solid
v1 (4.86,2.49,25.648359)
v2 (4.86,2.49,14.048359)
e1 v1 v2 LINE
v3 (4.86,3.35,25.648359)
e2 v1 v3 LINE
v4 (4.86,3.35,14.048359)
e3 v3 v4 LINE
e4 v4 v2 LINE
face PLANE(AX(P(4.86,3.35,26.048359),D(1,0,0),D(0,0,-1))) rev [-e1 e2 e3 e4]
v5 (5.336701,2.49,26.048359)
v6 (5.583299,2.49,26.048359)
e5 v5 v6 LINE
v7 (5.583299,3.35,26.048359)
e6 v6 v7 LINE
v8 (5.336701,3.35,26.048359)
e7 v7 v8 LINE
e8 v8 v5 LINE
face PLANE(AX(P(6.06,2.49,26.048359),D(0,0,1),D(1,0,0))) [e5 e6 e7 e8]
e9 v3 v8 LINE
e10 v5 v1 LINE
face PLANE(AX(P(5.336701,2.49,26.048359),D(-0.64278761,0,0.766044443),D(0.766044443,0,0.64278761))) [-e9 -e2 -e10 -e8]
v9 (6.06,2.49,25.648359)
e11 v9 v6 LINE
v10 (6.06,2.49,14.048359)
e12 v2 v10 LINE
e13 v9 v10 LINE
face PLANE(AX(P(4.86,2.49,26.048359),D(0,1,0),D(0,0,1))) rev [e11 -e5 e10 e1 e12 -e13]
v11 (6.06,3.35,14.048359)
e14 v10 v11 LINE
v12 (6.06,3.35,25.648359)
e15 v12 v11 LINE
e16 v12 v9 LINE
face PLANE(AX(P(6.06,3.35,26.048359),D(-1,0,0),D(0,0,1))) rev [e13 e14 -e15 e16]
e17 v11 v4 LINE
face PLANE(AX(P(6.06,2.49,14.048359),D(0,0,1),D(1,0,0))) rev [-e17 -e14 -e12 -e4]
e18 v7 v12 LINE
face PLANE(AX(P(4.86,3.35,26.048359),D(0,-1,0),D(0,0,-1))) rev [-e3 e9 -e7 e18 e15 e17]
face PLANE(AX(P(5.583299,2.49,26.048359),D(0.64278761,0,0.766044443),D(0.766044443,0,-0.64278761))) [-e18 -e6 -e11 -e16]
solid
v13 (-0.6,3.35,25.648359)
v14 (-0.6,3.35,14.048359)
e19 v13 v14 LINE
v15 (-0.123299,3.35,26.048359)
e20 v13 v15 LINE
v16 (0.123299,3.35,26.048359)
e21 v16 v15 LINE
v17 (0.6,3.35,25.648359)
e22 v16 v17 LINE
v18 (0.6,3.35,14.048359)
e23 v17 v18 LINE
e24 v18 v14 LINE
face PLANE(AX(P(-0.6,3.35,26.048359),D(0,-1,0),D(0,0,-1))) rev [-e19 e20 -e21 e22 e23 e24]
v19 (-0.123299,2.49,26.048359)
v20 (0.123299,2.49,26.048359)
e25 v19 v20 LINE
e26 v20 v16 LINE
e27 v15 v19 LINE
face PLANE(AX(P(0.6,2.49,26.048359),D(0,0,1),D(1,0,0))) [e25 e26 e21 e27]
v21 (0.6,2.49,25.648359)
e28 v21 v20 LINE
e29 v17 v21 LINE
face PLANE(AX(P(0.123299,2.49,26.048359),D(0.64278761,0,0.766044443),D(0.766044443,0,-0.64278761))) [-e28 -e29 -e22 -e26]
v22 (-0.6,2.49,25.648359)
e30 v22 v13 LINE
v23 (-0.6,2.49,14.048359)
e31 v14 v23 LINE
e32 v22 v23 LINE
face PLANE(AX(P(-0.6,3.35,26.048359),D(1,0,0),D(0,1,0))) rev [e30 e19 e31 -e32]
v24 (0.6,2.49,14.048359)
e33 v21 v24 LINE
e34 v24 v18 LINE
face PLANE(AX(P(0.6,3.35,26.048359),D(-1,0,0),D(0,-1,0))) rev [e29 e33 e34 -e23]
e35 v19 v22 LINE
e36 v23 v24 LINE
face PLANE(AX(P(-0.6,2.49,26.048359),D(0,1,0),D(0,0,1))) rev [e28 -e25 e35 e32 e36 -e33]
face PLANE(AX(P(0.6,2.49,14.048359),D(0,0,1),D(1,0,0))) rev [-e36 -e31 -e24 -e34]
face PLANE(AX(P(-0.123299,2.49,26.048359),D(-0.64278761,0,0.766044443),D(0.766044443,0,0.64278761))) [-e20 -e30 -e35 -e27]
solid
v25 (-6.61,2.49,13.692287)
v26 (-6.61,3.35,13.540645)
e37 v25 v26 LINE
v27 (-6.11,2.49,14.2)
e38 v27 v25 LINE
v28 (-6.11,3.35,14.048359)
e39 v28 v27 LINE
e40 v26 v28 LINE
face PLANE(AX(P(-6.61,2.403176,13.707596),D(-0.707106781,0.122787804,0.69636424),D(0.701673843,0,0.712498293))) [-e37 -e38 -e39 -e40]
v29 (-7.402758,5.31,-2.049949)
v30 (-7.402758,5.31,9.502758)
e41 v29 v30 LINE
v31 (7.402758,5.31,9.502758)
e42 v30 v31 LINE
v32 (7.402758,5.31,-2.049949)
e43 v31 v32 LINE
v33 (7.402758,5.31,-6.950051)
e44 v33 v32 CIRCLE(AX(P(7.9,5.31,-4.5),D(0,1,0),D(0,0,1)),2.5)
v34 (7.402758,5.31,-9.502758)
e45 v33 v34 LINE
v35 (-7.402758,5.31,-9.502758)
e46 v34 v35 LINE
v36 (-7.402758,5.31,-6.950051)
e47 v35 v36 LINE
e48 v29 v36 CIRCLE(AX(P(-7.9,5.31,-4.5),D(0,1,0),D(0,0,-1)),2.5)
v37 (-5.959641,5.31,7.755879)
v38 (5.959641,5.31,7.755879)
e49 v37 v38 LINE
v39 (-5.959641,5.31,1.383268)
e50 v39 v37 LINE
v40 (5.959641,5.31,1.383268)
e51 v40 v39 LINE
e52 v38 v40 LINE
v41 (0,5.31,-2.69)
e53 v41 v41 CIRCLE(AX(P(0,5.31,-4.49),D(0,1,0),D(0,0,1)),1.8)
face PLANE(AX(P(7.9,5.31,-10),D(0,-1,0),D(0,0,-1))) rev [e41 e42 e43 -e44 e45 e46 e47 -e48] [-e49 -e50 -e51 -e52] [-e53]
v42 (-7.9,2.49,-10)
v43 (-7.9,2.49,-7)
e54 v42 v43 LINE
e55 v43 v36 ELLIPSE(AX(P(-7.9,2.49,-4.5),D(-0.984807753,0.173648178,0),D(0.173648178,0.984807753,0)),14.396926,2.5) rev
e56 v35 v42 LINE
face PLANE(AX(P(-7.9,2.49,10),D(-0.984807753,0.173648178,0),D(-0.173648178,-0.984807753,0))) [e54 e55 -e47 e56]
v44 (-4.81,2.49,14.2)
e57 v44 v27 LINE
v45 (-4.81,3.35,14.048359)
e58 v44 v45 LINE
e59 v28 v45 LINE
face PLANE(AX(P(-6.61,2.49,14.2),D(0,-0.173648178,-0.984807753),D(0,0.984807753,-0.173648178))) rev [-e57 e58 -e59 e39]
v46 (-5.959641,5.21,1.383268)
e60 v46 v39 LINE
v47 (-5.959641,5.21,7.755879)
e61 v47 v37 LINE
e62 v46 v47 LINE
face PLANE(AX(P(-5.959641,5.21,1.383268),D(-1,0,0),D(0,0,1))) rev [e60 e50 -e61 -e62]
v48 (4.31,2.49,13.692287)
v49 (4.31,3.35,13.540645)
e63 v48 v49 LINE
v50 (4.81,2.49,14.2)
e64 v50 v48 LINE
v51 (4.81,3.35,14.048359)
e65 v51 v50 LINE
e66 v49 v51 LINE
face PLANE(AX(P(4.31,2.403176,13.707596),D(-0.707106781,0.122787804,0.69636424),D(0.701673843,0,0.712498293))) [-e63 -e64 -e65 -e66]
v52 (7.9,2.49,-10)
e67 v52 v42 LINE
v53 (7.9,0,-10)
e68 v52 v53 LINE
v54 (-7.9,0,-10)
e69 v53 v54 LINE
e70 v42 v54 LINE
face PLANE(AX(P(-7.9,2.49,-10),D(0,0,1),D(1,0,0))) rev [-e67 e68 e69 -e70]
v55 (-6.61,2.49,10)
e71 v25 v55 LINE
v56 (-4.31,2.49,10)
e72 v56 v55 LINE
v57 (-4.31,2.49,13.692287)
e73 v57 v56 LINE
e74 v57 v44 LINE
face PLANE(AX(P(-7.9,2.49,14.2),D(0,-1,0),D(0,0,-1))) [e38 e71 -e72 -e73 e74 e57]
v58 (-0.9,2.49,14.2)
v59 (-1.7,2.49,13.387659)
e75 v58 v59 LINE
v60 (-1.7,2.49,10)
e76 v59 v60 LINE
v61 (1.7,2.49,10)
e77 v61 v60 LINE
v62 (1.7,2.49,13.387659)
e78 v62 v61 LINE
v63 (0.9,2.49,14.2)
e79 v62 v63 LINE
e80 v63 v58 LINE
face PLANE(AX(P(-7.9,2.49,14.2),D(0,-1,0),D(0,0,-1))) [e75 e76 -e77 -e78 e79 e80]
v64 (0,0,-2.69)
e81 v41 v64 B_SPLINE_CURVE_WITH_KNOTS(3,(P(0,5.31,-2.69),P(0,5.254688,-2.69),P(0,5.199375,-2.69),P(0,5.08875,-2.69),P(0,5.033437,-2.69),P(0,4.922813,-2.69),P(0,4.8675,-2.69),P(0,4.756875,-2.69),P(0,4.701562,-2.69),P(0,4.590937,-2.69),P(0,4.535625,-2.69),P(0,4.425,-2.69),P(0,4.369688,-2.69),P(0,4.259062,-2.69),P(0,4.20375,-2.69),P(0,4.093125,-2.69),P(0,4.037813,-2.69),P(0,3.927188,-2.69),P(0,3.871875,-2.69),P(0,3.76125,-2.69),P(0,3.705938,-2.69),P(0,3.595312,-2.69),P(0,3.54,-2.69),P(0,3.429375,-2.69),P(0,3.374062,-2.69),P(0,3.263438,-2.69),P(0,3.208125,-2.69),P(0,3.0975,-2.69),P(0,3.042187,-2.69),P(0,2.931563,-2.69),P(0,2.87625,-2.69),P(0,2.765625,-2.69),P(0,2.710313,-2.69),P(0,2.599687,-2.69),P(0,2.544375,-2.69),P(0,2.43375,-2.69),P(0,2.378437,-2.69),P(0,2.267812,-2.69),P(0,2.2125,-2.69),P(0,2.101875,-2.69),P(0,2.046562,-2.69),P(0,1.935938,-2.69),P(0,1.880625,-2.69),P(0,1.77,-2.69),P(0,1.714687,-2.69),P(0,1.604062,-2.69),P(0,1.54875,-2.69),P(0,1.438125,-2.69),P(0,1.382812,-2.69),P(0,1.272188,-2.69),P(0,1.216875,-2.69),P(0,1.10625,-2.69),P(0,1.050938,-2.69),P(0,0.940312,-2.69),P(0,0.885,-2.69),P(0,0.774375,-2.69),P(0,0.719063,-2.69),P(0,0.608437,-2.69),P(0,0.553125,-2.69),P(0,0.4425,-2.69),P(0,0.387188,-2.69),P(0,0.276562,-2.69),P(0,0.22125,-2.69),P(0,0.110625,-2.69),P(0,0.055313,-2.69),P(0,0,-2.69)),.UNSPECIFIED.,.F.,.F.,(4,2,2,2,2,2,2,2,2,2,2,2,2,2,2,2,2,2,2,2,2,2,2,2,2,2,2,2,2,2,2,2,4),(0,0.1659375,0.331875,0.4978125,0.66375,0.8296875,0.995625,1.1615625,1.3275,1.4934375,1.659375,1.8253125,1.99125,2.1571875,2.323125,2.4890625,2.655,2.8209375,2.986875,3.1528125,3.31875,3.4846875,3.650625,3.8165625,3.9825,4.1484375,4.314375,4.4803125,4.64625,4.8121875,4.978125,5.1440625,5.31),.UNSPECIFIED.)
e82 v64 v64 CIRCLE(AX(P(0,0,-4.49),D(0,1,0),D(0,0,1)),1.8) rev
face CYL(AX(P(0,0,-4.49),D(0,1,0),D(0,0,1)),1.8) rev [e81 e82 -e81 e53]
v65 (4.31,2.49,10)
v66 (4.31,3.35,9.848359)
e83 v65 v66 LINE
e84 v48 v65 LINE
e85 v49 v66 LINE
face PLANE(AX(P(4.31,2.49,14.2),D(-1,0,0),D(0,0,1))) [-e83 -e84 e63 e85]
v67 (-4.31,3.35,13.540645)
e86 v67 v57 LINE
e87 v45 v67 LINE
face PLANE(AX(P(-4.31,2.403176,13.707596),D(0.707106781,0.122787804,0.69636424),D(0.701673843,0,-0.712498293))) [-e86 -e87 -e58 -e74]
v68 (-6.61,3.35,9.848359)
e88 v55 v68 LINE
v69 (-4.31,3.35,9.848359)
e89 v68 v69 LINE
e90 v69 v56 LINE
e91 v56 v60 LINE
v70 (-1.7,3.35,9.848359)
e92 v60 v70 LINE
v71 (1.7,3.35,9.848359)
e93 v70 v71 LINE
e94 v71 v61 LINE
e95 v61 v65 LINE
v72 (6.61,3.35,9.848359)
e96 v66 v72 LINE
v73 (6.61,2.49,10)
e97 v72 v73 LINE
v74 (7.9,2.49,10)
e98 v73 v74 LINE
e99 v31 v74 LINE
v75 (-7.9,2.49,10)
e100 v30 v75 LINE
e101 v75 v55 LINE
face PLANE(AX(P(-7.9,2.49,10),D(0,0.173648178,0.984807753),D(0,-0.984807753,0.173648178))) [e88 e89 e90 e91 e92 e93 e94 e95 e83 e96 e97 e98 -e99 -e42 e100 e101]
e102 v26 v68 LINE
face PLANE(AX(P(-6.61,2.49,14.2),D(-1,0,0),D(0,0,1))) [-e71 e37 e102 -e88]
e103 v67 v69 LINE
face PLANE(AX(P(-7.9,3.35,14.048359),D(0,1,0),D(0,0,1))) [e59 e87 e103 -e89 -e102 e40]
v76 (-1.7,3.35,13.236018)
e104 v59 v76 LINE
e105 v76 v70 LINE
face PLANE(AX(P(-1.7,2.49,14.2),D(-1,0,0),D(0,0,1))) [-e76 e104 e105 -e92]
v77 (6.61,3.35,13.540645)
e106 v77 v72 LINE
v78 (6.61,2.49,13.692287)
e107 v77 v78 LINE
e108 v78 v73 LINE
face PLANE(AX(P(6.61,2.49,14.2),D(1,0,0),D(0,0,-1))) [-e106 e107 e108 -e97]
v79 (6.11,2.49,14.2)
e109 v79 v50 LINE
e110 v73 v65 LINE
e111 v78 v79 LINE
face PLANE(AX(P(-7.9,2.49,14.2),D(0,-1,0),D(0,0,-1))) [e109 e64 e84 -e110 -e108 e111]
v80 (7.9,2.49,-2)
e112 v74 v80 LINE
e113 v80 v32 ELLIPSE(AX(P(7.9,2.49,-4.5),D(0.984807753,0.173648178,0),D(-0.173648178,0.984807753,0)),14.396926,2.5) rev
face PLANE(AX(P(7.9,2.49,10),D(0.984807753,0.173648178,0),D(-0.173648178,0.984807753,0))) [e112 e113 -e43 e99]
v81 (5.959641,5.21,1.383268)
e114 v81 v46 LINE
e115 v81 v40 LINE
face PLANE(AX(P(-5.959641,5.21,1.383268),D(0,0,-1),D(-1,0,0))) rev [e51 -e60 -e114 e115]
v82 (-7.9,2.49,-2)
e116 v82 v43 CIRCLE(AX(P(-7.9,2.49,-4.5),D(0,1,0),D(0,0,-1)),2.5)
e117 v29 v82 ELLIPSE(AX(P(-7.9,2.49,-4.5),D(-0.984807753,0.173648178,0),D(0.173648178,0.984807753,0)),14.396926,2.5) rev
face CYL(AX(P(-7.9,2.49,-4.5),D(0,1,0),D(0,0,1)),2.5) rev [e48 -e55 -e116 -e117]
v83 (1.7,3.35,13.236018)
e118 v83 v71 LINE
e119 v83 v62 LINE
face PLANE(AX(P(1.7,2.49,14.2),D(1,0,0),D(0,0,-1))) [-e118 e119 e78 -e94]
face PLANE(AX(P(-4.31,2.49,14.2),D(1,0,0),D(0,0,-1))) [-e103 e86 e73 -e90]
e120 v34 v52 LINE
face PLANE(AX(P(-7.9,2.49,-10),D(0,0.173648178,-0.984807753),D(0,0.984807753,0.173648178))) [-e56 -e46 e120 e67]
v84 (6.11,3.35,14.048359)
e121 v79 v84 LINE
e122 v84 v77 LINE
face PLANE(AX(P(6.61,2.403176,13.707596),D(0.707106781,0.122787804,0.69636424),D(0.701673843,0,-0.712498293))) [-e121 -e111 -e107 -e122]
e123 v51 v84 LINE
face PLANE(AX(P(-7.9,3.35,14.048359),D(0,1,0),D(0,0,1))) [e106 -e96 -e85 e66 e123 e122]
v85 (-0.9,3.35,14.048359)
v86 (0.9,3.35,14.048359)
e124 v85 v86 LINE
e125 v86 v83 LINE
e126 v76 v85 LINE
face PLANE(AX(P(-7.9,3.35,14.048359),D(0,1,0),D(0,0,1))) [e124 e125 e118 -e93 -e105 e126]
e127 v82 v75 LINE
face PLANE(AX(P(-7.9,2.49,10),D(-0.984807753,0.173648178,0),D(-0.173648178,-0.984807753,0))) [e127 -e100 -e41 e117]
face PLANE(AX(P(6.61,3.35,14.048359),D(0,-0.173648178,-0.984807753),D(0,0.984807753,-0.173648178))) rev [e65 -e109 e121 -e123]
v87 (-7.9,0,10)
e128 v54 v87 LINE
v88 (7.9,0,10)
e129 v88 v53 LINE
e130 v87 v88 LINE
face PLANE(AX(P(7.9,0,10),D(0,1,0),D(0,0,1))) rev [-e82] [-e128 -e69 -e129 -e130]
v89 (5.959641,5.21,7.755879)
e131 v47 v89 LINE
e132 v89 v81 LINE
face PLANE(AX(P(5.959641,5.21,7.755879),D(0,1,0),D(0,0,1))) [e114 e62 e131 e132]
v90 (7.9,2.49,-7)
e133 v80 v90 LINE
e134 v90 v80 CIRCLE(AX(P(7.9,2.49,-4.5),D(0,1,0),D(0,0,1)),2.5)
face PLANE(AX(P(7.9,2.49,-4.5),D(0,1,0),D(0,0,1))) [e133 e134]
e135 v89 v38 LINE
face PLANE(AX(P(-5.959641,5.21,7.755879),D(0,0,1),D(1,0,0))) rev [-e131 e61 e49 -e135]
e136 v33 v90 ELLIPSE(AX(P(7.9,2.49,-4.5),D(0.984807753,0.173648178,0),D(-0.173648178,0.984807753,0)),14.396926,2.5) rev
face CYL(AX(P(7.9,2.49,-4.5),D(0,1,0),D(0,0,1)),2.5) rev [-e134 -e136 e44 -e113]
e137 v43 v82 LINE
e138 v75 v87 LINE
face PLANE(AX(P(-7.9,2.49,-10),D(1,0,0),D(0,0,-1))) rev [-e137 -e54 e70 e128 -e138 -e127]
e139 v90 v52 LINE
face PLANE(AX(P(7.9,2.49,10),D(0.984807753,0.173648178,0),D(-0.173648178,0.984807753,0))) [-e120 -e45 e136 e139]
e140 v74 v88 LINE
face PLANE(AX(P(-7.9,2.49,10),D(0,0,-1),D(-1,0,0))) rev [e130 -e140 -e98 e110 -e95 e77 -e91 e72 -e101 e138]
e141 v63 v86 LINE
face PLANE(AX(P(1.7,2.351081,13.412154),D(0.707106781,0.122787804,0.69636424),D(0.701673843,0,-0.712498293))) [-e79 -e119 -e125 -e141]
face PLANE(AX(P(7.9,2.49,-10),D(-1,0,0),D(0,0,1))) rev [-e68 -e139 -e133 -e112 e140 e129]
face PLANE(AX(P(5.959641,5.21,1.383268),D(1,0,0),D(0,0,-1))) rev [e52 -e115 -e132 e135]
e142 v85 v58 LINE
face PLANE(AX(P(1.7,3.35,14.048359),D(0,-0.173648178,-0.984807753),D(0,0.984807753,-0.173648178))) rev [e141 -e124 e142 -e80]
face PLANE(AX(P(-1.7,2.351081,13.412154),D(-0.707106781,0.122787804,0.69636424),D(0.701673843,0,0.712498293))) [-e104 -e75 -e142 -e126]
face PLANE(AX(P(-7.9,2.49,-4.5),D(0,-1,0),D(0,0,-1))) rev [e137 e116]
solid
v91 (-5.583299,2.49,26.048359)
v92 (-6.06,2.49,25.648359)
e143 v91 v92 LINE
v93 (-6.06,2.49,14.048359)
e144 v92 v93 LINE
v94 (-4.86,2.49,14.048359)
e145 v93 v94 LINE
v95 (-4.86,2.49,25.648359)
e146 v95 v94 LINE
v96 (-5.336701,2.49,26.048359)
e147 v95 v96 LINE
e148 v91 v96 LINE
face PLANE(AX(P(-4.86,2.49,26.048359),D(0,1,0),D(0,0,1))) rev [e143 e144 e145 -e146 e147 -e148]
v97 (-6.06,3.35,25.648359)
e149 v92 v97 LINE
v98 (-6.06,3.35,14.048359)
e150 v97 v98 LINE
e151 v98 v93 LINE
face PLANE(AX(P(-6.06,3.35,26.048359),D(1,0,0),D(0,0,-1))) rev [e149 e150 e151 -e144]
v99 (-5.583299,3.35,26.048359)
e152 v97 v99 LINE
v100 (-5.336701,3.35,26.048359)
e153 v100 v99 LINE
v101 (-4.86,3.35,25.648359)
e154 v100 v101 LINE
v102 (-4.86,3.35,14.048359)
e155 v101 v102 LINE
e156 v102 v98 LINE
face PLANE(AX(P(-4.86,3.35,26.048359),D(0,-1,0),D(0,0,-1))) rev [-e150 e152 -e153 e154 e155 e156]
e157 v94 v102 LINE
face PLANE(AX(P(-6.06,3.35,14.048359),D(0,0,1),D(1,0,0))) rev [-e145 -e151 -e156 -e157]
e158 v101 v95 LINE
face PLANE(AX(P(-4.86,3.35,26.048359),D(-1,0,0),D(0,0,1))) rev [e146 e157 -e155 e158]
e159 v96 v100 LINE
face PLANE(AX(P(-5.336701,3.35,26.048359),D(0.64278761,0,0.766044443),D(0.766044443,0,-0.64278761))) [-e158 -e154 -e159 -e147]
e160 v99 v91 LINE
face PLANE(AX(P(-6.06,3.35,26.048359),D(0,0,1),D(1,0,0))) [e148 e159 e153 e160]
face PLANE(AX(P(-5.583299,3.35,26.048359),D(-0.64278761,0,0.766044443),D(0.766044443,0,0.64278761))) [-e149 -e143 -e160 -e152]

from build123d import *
from OCP.BRepFilletAPI import BRepFilletAPI_MakeChamfer

# Parameters (mm, degrees)
SKETCH1_W             = 15.8
SKETCH1_H             = 20
BOSS_EXTRUDE1_DEPTH   = 2.49
SKETCH2_W             = 15.8
SKETCH2_H             = 20
BOSS_EXTRUDE3_DEPTH   = 2.82
BOSS_EXTRUDE3_TAPER   = 10
BOSS_EXTRUDE4_START   = -1.7
BOSS_EXTRUDE4_DEPTH   = 3.4
BOSS_EXTRUDE4_START_2 = -6.61
BOSS_EXTRUDE4_2_DEPTH = 2.3
BOSS_EXTRUDE4_START_3 = 4.31
BOSS_EXTRUDE4_3_DEPTH = 2.3
BOSS_EXTRUDE6_START   = 14.04836
SKETCH5_W             = 1.2
SKETCH5_H             = 0.86
BOSS_EXTRUDE6_DEPTH   = 12
BOSS_EXTRUDE6_2_DEPTH = 12
BOSS_EXTRUDE6_3_DEPTH = 12
SKETCH6_R             = 1.8
CUT_EXTRUDE1_DEPTH    = 28.733069795
SKETCH7_R             = 2.5
CUT_EXTRUDE2_DEPTH    = 2.82
CHAMFER2_SIZE         = 0.5
CHAMFER3_SIZE         = 0.8
CHAMFER7_SIZE         = 0.4
CHAMFER7_SIZE2        = 0.476701437
CHAMFER8_SIZE         = 0.4
CHAMFER8_SIZE2        = 0.476701437
CHAMFER9_SIZE         = 0.4
CHAMFER9_SIZE2        = 0.476701437
SKETCH9_W             = 12.986336946
SKETCH9_H             = 15.440559179
CUT_EXTRUDE3_DEPTH    = 2.49
SKETCH10_W            = 12.986336946
SKETCH10_H            = 15.440559179
BOSS_EXTRUDE7_DEPTH   = 2.49
SKETCH13_R            = 1.8
CUT_EXTRUDE4_DEPTH    = 2.49
SKETCH14_W            = 11.919281888
SKETCH14_H            = 6.372610916
CUT_EXTRUDE5_DEPTH    = 0.1


# Read off the part's stored shape, not the designer's step: Boss-Extrude4
with BuildPart() as part:
    # Sketch1 → Boss-Extrude1 (new body)
    with BuildSketch(Plane(origin=(0, 0, 0), x_dir=(1, 0, 0), z_dir=(0, 1, 0))):
        Rectangle(SKETCH1_W, SKETCH1_H)
    extrude(amount=BOSS_EXTRUDE1_DEPTH)

    # Sketch2 → Boss-Extrude3 (add)
    with BuildSketch(Plane(origin=(0, 2.49, 0), x_dir=(1, 0, 0), z_dir=(0, 1, 0))):
        Rectangle(SKETCH2_W, SKETCH2_H)
    extrude(amount=BOSS_EXTRUDE3_DEPTH, taper=BOSS_EXTRUDE3_TAPER)

    # Boss-Extrude4 outline → Boss-Extrude4 (add)
    with BuildSketch(Plane.YZ.offset(BOSS_EXTRUDE4_START)):
        Polygon((2.49, 10), (3.35, 9.848358796), (3.35, 14.048358797), (2.49, 14.2), align=None)
    extrude(amount=BOSS_EXTRUDE4_DEPTH)

    # Boss-Extrude4 2 outline → Boss-Extrude4 2 (add)
    with BuildSketch(Plane.YZ.offset(BOSS_EXTRUDE4_START_2)):
        Polygon((2.49, 10), (3.35, 9.848358796), (3.35, 14.048358797), (2.49, 14.2), align=None)
    extrude(amount=BOSS_EXTRUDE4_2_DEPTH)

    # Boss-Extrude4 3 outline → Boss-Extrude4 3 (add)
    with BuildSketch(Plane.YZ.offset(BOSS_EXTRUDE4_START_3)):
        Polygon((2.49, 10), (3.35, 9.848358796), (3.35, 14.048358797), (2.49, 14.2), align=None)
    extrude(amount=BOSS_EXTRUDE4_3_DEPTH)

    # Sketch6 → Cut-Extrude1 (cut, through all)
    with BuildSketch(Plane(origin=(0, 5.31, 0), x_dir=(1, 0, 0), z_dir=(0, 1, 0))):
        with Locations(Location((0, 4.49, 0), (0, 0, 270))):
            Circle(SKETCH6_R)
    extrude(amount=-CUT_EXTRUDE1_DEPTH, mode=Mode.SUBTRACT)

    # Sketch7 → Cut-Extrude2 (cut)
    with BuildSketch(Plane(origin=(0, 5.31, 0), x_dir=(1, 0, 0), z_dir=(0, 1, 0))):
        with Locations((7.9, 4.5)):
            Circle(SKETCH7_R)
        with Locations((-7.9, 4.5)):
            Circle(SKETCH7_R)
    extrude(amount=-CUT_EXTRUDE2_DEPTH, mode=Mode.SUBTRACT)

    # Chamfer2
    chamfer2_edges = [part.edges().sort_by_distance(p)[0] for p in [
        (4.31, 2.92, 14.124179399),
        (6.61, 2.92, 14.124179399),
        (-4.31, 2.92, 14.124179399),
        (-6.61, 2.92, 14.124179399),
    ]]
    chamfer(chamfer2_edges, length=CHAMFER2_SIZE)

    # Chamfer3
    chamfer3_edges = [part.edges().sort_by_distance(p)[0] for p in [
        (1.7, 2.92, 14.124179399),
        (-1.7, 2.92, 14.124179399),
    ]]
    chamfer(chamfer3_edges, length=CHAMFER3_SIZE)

    # Sketch9 → Cut-Extrude3 (cut)
    with BuildSketch(Plane.XZ):
        with Locations((0, -0.672147613)):
            Rectangle(SKETCH9_W, SKETCH9_H)
    extrude(amount=-CUT_EXTRUDE3_DEPTH, mode=Mode.SUBTRACT)

    # Sketch10 → Boss-Extrude7 (add)
    with BuildSketch(Plane.XZ.offset(-2.49)):
        with Locations((0, -0.672147613)):
            Rectangle(SKETCH10_W, SKETCH10_H)
    extrude(amount=BOSS_EXTRUDE7_DEPTH)

    # Sketch13 → Cut-Extrude4 (cut)
    with BuildSketch(Plane(origin=(0, 2.49, 0), x_dir=(1, 0, 0), z_dir=(0, 1, 0))):
        with Locations(Location((0, 4.49, 0), (0, 0, 270))):
            Circle(SKETCH13_R)
    extrude(amount=-CUT_EXTRUDE4_DEPTH, mode=Mode.SUBTRACT)

    # Sketch14 → Cut-Extrude5 (cut)
    with BuildSketch(Plane(origin=(0, 5.31, 0), x_dir=(1, 0, 0), z_dir=(0, 1, 0))):
        with Locations((0, -4.569573217)):
            Rectangle(SKETCH14_W, SKETCH14_H)
    extrude(amount=-CUT_EXTRUDE5_DEPTH, mode=Mode.SUBTRACT)


with BuildPart() as body_2:
    # Sketch5 → Boss-Extrude6 (new body)
    with BuildSketch(Plane.XY.offset(BOSS_EXTRUDE6_START)):
        with Locations((0, 2.92)):
            Rectangle(SKETCH5_W, SKETCH5_H)
    extrude(amount=BOSS_EXTRUDE6_DEPTH)

    # Chamfer7: one chamfer whose edges measure the first distance from different faces: ONE call of the kernel's chamfer builder (chamfer() names one face for all edges)
    chamfer7_edges_1 = [body_2.edges().sort_by_distance(p)[0] for p in [
        (-0.6, 2.92, 26.04836),
    ]]
    chamfer7_side_1 = [body_2.faces().sort_by_distance(p)[0] for p in [
        (-0.6, 2.92, 20.04836),
    ]]
    chamfer7_edges_2 = [body_2.edges().sort_by_distance(p)[0] for p in [
        (0.6, 2.92, 26.04836),
    ]]
    chamfer7_side_2 = [body_2.faces().sort_by_distance(p)[0] for p in [
        (0.6, 2.92, 20.04836),
    ]]
    chamfer7 = BRepFilletAPI_MakeChamfer(body_2.part.solid().wrapped)
    for e in chamfer7_edges_1:
        chamfer7.Add(CHAMFER7_SIZE, CHAMFER7_SIZE2, e.wrapped, chamfer7_side_1[0].wrapped)  # the first distance lies on this face
    for e in chamfer7_edges_2:
        chamfer7.Add(CHAMFER7_SIZE, CHAMFER7_SIZE2, e.wrapped, chamfer7_side_2[0].wrapped)  # the first distance lies on this face
    add(Compound.cast(chamfer7.Shape()), mode=Mode.REPLACE)


with BuildPart() as body_3:
    # Sketch5 → Boss-Extrude6 2 (new body)
    with BuildSketch(Plane.XY.offset(BOSS_EXTRUDE6_START)):
        with Locations((5.46, 2.92)):
            Rectangle(SKETCH5_W, SKETCH5_H)
    extrude(amount=BOSS_EXTRUDE6_2_DEPTH)

    # Chamfer9: one chamfer whose edges measure the first distance from different faces: ONE call of the kernel's chamfer builder (chamfer() names one face for all edges)
    chamfer9_edges_1 = [body_3.edges().sort_by_distance(p)[0] for p in [
        (4.86, 2.92, 26.04836),
    ]]
    chamfer9_side_1 = [body_3.faces().sort_by_distance(p)[0] for p in [
        (4.86, 2.92, 20.04836),
    ]]
    chamfer9_edges_2 = [body_3.edges().sort_by_distance(p)[0] for p in [
        (6.06, 2.92, 26.04836),
    ]]
    chamfer9_side_2 = [body_3.faces().sort_by_distance(p)[0] for p in [
        (6.06, 2.92, 20.04836),
    ]]
    chamfer9 = BRepFilletAPI_MakeChamfer(body_3.part.solid().wrapped)
    for e in chamfer9_edges_1:
        chamfer9.Add(CHAMFER9_SIZE, CHAMFER9_SIZE2, e.wrapped, chamfer9_side_1[0].wrapped)  # the first distance lies on this face
    for e in chamfer9_edges_2:
        chamfer9.Add(CHAMFER9_SIZE, CHAMFER9_SIZE2, e.wrapped, chamfer9_side_2[0].wrapped)  # the first distance lies on this face
    add(Compound.cast(chamfer9.Shape()), mode=Mode.REPLACE)


with BuildPart() as body_4:
    # Sketch5 → Boss-Extrude6 3 (new body)
    with BuildSketch(Plane.XY.offset(BOSS_EXTRUDE6_START)):
        with Locations((-5.46, 2.92)):
            Rectangle(SKETCH5_W, SKETCH5_H)
    extrude(amount=BOSS_EXTRUDE6_3_DEPTH)

    # Chamfer8: one chamfer whose edges measure the first distance from different faces: ONE call of the kernel's chamfer builder (chamfer() names one face for all edges)
    chamfer8_edges_1 = [body_4.edges().sort_by_distance(p)[0] for p in [
        (-4.86, 2.92, 26.04836),
    ]]
    chamfer8_side_1 = [body_4.faces().sort_by_distance(p)[0] for p in [
        (-4.86, 2.92, 20.04836),
    ]]
    chamfer8_edges_2 = [body_4.edges().sort_by_distance(p)[0] for p in [
        (-6.06, 2.92, 26.04836),
    ]]
    chamfer8_side_2 = [body_4.faces().sort_by_distance(p)[0] for p in [
        (-6.06, 2.92, 20.04836),
    ]]
    chamfer8 = BRepFilletAPI_MakeChamfer(body_4.part.solid().wrapped)
    for e in chamfer8_edges_1:
        chamfer8.Add(CHAMFER8_SIZE, CHAMFER8_SIZE2, e.wrapped, chamfer8_side_1[0].wrapped)  # the first distance lies on this face
    for e in chamfer8_edges_2:
        chamfer8.Add(CHAMFER8_SIZE, CHAMFER8_SIZE2, e.wrapped, chamfer8_side_2[0].wrapped)  # the first distance lies on this face
    add(Compound.cast(chamfer8.Shape()), mode=Mode.REPLACE)


solid = Compound([part.part, body_2.part, body_3.part, body_4.part])
